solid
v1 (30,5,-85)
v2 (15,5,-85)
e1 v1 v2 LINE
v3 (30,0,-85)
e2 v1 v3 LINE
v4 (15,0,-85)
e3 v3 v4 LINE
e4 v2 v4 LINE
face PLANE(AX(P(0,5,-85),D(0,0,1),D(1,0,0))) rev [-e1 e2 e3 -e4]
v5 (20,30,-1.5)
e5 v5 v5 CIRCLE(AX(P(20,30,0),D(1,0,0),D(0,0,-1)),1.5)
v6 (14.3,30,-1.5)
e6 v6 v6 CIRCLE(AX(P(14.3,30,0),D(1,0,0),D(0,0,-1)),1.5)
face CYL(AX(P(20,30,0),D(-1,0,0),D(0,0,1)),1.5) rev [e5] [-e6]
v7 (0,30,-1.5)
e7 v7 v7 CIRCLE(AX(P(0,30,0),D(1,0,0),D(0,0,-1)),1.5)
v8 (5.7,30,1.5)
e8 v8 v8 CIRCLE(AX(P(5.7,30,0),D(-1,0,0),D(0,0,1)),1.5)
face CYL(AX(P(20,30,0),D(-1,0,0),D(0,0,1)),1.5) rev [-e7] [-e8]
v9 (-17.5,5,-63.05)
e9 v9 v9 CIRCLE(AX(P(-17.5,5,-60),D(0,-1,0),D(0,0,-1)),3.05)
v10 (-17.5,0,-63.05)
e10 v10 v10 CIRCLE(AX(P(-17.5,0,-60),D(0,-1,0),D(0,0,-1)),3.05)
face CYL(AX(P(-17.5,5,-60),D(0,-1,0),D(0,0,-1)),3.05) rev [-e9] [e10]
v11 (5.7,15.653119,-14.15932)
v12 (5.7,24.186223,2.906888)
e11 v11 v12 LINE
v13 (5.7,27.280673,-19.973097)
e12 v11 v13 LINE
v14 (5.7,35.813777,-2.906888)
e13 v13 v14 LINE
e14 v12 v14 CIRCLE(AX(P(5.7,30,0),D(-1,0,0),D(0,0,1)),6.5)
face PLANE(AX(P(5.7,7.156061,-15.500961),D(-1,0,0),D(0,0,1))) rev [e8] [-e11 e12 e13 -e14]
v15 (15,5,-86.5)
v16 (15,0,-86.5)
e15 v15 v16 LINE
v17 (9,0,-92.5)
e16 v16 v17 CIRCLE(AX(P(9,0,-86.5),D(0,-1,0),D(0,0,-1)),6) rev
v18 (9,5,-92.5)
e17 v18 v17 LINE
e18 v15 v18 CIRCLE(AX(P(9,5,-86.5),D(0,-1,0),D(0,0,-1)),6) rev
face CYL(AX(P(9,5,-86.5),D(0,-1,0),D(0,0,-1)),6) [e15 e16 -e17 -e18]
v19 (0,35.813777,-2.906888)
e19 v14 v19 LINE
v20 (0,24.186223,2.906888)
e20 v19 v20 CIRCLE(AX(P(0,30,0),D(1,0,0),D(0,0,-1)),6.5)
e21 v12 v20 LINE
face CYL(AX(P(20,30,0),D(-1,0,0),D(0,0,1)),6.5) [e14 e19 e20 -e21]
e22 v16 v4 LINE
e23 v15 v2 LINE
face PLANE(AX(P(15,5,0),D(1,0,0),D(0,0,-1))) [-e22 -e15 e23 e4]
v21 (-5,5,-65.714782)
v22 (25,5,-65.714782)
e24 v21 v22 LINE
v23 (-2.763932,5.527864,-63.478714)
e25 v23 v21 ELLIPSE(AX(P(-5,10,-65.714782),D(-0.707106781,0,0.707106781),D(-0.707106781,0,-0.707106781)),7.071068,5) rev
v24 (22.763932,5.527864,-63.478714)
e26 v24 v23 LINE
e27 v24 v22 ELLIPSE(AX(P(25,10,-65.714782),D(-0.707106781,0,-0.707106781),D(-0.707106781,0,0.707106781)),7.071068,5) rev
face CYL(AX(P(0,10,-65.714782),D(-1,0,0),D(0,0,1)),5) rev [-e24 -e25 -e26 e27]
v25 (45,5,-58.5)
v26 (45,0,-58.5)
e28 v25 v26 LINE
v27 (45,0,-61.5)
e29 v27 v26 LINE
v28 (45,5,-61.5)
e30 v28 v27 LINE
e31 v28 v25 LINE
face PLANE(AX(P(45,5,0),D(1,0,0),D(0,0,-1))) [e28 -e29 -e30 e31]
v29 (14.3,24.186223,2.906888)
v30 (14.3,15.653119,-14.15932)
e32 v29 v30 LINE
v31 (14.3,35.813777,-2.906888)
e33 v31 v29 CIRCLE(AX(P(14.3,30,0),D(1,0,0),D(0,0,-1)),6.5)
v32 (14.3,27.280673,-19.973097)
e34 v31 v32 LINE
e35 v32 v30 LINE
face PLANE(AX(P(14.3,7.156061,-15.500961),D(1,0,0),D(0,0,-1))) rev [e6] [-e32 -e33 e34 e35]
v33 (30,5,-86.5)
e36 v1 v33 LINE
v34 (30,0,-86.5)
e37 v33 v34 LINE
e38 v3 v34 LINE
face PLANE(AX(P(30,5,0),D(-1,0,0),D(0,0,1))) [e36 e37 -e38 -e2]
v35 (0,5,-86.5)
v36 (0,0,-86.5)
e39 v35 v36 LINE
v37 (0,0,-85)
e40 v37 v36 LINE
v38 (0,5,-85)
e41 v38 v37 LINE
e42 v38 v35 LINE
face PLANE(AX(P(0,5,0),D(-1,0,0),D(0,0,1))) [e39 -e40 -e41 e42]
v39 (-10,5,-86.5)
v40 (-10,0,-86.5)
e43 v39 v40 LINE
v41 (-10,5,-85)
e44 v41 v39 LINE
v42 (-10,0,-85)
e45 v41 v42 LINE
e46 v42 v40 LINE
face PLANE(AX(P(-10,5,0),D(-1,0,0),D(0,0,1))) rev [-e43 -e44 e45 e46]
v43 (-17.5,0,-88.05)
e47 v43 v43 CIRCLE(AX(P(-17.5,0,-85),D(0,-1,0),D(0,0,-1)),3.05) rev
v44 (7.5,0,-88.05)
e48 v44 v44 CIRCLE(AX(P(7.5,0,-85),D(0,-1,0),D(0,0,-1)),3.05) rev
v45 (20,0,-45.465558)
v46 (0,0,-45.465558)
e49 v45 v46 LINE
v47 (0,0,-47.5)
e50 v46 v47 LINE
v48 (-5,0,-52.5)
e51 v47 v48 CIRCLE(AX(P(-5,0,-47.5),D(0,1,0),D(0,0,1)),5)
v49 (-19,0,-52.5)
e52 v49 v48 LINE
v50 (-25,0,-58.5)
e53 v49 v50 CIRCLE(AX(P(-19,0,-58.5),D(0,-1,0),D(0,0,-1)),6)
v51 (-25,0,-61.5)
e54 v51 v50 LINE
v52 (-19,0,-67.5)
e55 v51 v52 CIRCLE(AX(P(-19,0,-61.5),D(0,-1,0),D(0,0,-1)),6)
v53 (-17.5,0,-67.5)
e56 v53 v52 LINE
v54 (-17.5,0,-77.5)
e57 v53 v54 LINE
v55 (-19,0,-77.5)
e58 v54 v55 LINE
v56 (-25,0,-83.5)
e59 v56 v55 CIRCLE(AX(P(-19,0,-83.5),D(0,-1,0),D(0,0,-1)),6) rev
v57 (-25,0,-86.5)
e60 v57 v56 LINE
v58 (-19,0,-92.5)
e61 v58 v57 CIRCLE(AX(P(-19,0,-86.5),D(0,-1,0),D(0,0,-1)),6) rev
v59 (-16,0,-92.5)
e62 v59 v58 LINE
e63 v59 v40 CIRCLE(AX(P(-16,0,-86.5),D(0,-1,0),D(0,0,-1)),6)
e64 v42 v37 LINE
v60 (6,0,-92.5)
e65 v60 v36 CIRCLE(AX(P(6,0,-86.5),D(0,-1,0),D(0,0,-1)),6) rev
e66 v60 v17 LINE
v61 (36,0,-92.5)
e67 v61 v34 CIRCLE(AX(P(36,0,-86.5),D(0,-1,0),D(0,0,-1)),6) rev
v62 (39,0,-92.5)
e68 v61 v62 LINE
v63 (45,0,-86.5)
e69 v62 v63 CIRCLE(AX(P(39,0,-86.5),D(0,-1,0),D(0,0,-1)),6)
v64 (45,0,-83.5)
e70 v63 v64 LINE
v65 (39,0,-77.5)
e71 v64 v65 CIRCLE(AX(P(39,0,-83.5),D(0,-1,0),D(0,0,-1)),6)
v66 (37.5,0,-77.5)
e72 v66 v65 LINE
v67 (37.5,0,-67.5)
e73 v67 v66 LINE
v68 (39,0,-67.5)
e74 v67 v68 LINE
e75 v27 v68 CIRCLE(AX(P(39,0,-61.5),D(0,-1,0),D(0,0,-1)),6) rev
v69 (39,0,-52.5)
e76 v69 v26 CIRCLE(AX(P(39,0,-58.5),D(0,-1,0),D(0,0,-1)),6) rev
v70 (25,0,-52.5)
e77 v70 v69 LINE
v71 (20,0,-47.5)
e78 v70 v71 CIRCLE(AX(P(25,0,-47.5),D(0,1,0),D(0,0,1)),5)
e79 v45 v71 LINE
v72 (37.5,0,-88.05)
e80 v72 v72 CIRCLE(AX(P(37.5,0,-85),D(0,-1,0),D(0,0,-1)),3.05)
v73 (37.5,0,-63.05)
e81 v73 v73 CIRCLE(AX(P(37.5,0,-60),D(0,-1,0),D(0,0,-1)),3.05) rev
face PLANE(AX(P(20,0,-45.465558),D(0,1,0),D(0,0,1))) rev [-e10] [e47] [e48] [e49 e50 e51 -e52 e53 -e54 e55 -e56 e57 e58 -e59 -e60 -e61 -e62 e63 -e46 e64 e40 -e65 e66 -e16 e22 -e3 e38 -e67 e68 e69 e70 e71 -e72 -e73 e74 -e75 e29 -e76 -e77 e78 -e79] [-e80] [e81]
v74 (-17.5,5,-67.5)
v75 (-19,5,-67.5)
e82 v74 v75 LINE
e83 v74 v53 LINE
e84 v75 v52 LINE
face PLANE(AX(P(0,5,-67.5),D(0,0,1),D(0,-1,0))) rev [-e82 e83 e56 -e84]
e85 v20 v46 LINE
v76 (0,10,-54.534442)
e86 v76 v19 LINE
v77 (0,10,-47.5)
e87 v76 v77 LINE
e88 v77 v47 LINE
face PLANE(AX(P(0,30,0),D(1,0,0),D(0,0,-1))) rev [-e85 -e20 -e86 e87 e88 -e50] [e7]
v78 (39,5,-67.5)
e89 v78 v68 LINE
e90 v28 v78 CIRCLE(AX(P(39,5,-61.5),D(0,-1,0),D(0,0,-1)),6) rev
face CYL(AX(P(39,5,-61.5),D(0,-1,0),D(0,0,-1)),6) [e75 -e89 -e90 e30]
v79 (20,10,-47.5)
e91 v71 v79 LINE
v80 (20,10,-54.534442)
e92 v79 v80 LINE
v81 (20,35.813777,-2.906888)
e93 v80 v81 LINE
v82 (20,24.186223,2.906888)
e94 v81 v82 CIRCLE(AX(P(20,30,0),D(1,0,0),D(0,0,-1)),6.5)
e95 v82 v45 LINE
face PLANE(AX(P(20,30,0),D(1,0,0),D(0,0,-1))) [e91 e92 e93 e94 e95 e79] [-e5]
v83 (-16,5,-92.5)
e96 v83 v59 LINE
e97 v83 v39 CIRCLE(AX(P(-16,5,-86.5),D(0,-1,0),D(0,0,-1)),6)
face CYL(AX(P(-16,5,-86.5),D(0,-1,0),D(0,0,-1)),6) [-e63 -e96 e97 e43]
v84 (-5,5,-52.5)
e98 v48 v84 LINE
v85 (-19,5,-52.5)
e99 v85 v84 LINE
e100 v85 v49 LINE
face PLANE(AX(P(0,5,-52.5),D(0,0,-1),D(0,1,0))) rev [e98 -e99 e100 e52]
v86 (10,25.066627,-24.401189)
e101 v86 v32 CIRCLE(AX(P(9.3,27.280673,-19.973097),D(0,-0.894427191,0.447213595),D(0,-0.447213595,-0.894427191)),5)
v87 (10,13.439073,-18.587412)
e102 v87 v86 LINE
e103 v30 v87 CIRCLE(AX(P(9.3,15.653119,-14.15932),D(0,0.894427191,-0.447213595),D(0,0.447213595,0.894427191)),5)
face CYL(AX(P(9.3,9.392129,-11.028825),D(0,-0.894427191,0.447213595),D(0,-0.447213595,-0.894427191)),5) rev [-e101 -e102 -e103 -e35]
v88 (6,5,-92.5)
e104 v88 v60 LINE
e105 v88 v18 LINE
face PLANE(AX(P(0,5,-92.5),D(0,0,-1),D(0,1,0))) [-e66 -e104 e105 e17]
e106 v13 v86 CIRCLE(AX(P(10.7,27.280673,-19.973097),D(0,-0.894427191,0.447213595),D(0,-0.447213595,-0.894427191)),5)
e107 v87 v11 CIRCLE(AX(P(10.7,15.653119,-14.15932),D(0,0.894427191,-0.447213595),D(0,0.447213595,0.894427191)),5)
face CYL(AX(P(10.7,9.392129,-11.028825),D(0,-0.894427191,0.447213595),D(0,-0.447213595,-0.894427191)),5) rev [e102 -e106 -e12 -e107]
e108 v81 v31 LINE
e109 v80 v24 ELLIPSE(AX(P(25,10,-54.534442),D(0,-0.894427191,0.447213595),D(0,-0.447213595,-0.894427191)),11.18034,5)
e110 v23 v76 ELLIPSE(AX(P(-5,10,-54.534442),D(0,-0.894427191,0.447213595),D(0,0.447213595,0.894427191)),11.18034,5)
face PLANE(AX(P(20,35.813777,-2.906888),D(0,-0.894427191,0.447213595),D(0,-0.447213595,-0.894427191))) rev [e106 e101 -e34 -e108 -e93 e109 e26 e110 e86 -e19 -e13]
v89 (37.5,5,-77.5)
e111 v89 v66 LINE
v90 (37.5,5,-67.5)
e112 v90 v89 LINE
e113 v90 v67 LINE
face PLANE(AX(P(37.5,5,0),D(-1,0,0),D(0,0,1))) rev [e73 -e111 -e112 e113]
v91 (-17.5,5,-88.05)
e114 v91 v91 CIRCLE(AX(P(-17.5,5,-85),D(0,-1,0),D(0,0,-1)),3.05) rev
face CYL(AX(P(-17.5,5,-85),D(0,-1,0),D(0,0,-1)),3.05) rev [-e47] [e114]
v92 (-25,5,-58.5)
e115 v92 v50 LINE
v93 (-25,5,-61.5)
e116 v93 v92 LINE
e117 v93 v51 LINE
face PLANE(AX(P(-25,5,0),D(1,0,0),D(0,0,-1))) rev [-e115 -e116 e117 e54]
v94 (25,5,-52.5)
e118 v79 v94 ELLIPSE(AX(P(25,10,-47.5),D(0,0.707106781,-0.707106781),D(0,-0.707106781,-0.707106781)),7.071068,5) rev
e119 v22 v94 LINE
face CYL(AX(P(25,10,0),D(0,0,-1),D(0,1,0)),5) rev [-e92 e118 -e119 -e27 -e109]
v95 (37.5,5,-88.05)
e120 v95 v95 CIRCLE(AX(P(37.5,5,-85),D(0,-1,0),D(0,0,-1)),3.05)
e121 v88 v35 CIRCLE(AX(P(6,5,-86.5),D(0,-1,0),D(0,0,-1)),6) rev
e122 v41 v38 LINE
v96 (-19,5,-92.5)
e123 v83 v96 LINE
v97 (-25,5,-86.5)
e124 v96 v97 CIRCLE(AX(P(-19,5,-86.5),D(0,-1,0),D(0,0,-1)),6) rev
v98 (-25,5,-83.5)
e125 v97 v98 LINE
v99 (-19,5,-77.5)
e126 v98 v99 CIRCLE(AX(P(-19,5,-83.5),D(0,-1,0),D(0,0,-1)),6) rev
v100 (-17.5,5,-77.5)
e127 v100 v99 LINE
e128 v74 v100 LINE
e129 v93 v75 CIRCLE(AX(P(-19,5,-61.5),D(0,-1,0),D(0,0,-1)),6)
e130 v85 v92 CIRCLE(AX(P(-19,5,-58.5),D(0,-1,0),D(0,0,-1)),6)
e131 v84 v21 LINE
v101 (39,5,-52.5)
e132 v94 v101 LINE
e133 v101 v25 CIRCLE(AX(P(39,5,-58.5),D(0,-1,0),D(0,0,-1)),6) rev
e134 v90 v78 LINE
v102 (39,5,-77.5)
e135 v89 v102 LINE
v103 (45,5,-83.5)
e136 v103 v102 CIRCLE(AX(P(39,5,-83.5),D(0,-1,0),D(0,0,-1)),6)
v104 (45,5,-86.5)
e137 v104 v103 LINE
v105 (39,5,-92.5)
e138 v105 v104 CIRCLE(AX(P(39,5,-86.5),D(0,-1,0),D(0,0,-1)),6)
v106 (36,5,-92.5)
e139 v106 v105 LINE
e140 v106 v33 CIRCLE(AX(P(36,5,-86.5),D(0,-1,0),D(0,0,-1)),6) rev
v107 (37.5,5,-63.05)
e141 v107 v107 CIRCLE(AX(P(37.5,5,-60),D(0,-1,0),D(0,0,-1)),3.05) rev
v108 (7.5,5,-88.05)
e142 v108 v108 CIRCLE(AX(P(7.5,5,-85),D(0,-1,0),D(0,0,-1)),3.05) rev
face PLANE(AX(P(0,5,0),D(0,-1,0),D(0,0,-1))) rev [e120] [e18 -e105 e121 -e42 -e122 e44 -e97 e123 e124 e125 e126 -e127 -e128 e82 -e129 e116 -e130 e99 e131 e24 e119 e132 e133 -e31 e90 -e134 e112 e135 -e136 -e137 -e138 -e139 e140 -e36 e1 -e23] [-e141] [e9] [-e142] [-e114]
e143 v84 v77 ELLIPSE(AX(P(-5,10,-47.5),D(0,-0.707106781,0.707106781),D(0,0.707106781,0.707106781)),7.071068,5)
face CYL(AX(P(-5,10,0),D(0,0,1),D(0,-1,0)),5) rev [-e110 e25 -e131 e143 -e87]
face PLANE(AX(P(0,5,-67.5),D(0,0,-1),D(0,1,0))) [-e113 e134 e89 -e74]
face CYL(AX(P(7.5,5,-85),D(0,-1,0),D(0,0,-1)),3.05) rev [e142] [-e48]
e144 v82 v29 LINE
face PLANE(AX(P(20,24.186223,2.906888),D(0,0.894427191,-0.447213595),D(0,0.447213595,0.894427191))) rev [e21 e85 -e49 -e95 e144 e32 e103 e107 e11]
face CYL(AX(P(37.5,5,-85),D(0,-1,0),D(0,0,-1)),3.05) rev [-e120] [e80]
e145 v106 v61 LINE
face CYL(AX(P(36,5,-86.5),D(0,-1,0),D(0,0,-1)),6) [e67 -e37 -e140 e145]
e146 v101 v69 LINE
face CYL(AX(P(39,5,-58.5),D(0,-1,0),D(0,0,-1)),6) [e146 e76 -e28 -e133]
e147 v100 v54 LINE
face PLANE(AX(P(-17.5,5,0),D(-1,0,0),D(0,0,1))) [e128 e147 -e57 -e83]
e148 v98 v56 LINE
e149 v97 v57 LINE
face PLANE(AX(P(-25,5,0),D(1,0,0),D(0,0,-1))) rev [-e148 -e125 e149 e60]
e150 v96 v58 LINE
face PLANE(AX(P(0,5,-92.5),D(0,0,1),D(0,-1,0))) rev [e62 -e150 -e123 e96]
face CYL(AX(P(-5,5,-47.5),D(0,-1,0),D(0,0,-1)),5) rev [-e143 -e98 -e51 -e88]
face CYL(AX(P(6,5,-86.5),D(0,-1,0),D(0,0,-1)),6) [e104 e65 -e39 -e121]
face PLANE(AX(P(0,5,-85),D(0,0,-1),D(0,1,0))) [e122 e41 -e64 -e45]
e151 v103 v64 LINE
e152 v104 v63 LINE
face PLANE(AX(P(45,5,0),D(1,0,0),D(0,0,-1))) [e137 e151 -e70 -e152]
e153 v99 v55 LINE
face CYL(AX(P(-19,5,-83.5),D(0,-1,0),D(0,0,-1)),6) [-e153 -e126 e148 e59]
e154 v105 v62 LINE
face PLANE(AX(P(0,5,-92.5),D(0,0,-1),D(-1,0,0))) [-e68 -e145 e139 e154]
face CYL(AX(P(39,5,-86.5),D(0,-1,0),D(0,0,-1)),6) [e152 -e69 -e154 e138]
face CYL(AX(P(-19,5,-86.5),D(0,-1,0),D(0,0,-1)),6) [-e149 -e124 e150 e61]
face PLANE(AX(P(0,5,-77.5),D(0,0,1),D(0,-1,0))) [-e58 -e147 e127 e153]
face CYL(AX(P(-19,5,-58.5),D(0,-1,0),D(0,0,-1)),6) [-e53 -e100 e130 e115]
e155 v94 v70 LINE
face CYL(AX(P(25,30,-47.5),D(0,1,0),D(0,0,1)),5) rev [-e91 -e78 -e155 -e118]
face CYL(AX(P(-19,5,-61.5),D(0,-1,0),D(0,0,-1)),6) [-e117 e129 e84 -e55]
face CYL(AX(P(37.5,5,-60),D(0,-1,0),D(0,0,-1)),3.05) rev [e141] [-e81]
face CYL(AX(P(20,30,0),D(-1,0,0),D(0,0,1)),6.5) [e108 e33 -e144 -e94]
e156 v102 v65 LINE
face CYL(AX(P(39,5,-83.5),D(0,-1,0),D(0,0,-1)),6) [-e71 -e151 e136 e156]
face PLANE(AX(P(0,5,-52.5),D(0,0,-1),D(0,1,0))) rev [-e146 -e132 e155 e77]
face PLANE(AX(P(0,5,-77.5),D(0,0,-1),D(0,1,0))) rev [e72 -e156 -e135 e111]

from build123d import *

# Parameters (mm, degrees)
SKETCH1_R           = 1.5
BOSS_EXTRUDE1_DEPTH = 20
SKETCH2_W           = 8.6
SKETCH2_H           = 36.312939462
CUT_EXTRUDE1_DEPTH  = 20
FILLET2_R           = 5
SKETCH3_R           = 3.05
BOSS_EXTRUDE3_DEPTH = 5
FILLET3_R           = 5
FILLET4_R           = 5


with BuildPart() as part:
    # Sketch1 → Boss-Extrude1 (new body)
    with BuildSketch(Plane(origin=(0, 0, 0), x_dir=(0, 0, -1), z_dir=(1, 0, 0))):
        with BuildLine():
            Line((2.906888371, 35.813776741), (74.534441854, 0))
            Line((74.534441854, 0), (45.465558146, 0))
            Line((45.465558146, 0), (-2.906888371, 24.186223259))
            ThreePointArc((-2.906888371, 24.186223259), (-5.813776741, 32.906888371), (2.906888371, 35.813776741))
        make_face()
        with Locations((0, 30)):
            Circle(SKETCH1_R, mode=Mode.SUBTRACT)
    extrude(amount=BOSS_EXTRUDE1_DEPTH)

    # Sketch2 → Cut-Extrude1 (cut)
    with BuildSketch(Plane(origin=(0, 29.813776741, -14.906888371), x_dir=(1, 0, 0), z_dir=(0, 0.894427190999916, -0.4472135954999577))):
        with Locations((10, -7.492276671)):
            Rectangle(SKETCH2_W, SKETCH2_H)
    extrude(amount=-CUT_EXTRUDE1_DEPTH, mode=Mode.SUBTRACT)

    # Fillet2
    # the kernel refuses this fillet: 5 mm, written as the material it adds along each edge
    with BuildSketch(Plane(origin=(5.7, 25.04460462, -24.445232613), x_dir=(1, 0, 0), z_dir=(0, -0.894427190999916, 0.4472135954999577)), Plane(origin=(14.3, 25.04460462, -24.445232613), x_dir=(0, 0.44721359549995776, 0.894427190999916), z_dir=(0, -0.894427190999916, 0.4472135954999577))) as fillet2_piece_1:
        with BuildLine():
            CenterArc((FILLET2_R, FILLET2_R), FILLET2_R, 180, 90)
            Line((0, FILLET2_R), (0, 0))
            Line((0, 0), (FILLET2_R, 0))
        make_face()
    extrude(amount=13)

    # Sketch3 → Boss-Extrude3 (add)
    with BuildSketch(Plane.XZ):
        with BuildLine():
            Line((-19, -92.5), (-16, -92.5))
            ThreePointArc((-16, -92.5), (-11.757359313, -90.742640687), (-10, -86.5))
            Line((-10, -86.5), (-10, -85))
            Line((-10, -85), (0, -85))
            Line((0, -85), (0, -86.5))
            ThreePointArc((0, -86.5), (1.757359313, -90.742640687), (6, -92.5))
            Line((6, -92.5), (9, -92.5))
            ThreePointArc((9, -92.5), (13.242640687, -90.742640687), (15, -86.5))
            Line((15, -86.5), (15, -85))
            Line((15, -85), (30, -85))
            Line((30, -85), (30, -86.5))
            ThreePointArc((30, -86.5), (31.757359313, -90.742640687), (36, -92.5))
            Line((36, -92.5), (39, -92.5))
            ThreePointArc((39, -92.5), (43.242640687, -90.742640687), (45, -86.5))
            Line((45, -86.5), (45, -83.5))
            ThreePointArc((45, -83.5), (43.242640687, -79.257359313), (39, -77.5))
            Line((39, -77.5), (37.5, -77.5))
            Line((37.5, -77.5), (37.5, -67.5))
            Line((37.5, -67.5), (39, -67.5))
            ThreePointArc((39, -67.5), (43.242640687, -65.742640687), (45, -61.5))
            Line((45, -61.5), (45, -58.5))
            ThreePointArc((45, -58.5), (43.242640687, -54.257359313), (39, -52.5))
            Line((39, -52.5), (37.5, -52.5))
            Line((37.5, -52.5), (-17.5, -52.5))
            Line((-17.5, -52.5), (-19, -52.5))
            ThreePointArc((-19, -52.5), (-23.242640687, -54.257359313), (-25, -58.5))
            Line((-25, -58.5), (-25, -61.5))
            ThreePointArc((-25, -61.5), (-23.242640687, -65.742640687), (-19, -67.5))
            Line((-19, -67.5), (-17.5, -67.5))
            Line((-17.5, -67.5), (-17.5, -77.5))
            Line((-17.5, -77.5), (-19, -77.5))
            ThreePointArc((-19, -77.5), (-23.242640687, -79.257359313), (-25, -83.5))
            Line((-25, -83.5), (-25, -86.5))
            ThreePointArc((-25, -86.5), (-23.242640687, -90.742640687), (-19, -92.5))
        make_face()
        with Locations(Location((-17.5, -85, 0), (0, 0, 270))):
            Circle(SKETCH3_R, mode=Mode.SUBTRACT)
        with Locations(Location((7.5, -85, 0), (0, 0, 270))):
            Circle(SKETCH3_R, mode=Mode.SUBTRACT)
        with Locations(Location((37.5, -85, 0), (0, 0, 270))):
            Circle(SKETCH3_R, mode=Mode.SUBTRACT)
        with Locations(Location((-17.5, -60, 0), (0, 0, 270))):
            Circle(SKETCH3_R, mode=Mode.SUBTRACT)
        with Locations(Location((37.5, -60, 0), (0, 0, 270))):
            Circle(SKETCH3_R, mode=Mode.SUBTRACT)
    extrude(amount=-BOSS_EXTRUDE3_DEPTH)

    # Fillet3
    fillet3_edges = [part.edges().sort_by_distance(p)[0] for p in [
        (10, 5, -64.534441854),
        (20, 5, -58.517220927),
        (0, 5, -58.517220927),
    ]]
    fillet(fillet3_edges, radius=FILLET3_R)

    # Fillet4
    fillet4_edges = [part.edges().sort_by_distance(p)[0] for p in [
        (0, 5, -52.5),
        (20, 5, -52.5),
    ]]
    fillet(fillet4_edges, radius=FILLET4_R)


solid = part.part
